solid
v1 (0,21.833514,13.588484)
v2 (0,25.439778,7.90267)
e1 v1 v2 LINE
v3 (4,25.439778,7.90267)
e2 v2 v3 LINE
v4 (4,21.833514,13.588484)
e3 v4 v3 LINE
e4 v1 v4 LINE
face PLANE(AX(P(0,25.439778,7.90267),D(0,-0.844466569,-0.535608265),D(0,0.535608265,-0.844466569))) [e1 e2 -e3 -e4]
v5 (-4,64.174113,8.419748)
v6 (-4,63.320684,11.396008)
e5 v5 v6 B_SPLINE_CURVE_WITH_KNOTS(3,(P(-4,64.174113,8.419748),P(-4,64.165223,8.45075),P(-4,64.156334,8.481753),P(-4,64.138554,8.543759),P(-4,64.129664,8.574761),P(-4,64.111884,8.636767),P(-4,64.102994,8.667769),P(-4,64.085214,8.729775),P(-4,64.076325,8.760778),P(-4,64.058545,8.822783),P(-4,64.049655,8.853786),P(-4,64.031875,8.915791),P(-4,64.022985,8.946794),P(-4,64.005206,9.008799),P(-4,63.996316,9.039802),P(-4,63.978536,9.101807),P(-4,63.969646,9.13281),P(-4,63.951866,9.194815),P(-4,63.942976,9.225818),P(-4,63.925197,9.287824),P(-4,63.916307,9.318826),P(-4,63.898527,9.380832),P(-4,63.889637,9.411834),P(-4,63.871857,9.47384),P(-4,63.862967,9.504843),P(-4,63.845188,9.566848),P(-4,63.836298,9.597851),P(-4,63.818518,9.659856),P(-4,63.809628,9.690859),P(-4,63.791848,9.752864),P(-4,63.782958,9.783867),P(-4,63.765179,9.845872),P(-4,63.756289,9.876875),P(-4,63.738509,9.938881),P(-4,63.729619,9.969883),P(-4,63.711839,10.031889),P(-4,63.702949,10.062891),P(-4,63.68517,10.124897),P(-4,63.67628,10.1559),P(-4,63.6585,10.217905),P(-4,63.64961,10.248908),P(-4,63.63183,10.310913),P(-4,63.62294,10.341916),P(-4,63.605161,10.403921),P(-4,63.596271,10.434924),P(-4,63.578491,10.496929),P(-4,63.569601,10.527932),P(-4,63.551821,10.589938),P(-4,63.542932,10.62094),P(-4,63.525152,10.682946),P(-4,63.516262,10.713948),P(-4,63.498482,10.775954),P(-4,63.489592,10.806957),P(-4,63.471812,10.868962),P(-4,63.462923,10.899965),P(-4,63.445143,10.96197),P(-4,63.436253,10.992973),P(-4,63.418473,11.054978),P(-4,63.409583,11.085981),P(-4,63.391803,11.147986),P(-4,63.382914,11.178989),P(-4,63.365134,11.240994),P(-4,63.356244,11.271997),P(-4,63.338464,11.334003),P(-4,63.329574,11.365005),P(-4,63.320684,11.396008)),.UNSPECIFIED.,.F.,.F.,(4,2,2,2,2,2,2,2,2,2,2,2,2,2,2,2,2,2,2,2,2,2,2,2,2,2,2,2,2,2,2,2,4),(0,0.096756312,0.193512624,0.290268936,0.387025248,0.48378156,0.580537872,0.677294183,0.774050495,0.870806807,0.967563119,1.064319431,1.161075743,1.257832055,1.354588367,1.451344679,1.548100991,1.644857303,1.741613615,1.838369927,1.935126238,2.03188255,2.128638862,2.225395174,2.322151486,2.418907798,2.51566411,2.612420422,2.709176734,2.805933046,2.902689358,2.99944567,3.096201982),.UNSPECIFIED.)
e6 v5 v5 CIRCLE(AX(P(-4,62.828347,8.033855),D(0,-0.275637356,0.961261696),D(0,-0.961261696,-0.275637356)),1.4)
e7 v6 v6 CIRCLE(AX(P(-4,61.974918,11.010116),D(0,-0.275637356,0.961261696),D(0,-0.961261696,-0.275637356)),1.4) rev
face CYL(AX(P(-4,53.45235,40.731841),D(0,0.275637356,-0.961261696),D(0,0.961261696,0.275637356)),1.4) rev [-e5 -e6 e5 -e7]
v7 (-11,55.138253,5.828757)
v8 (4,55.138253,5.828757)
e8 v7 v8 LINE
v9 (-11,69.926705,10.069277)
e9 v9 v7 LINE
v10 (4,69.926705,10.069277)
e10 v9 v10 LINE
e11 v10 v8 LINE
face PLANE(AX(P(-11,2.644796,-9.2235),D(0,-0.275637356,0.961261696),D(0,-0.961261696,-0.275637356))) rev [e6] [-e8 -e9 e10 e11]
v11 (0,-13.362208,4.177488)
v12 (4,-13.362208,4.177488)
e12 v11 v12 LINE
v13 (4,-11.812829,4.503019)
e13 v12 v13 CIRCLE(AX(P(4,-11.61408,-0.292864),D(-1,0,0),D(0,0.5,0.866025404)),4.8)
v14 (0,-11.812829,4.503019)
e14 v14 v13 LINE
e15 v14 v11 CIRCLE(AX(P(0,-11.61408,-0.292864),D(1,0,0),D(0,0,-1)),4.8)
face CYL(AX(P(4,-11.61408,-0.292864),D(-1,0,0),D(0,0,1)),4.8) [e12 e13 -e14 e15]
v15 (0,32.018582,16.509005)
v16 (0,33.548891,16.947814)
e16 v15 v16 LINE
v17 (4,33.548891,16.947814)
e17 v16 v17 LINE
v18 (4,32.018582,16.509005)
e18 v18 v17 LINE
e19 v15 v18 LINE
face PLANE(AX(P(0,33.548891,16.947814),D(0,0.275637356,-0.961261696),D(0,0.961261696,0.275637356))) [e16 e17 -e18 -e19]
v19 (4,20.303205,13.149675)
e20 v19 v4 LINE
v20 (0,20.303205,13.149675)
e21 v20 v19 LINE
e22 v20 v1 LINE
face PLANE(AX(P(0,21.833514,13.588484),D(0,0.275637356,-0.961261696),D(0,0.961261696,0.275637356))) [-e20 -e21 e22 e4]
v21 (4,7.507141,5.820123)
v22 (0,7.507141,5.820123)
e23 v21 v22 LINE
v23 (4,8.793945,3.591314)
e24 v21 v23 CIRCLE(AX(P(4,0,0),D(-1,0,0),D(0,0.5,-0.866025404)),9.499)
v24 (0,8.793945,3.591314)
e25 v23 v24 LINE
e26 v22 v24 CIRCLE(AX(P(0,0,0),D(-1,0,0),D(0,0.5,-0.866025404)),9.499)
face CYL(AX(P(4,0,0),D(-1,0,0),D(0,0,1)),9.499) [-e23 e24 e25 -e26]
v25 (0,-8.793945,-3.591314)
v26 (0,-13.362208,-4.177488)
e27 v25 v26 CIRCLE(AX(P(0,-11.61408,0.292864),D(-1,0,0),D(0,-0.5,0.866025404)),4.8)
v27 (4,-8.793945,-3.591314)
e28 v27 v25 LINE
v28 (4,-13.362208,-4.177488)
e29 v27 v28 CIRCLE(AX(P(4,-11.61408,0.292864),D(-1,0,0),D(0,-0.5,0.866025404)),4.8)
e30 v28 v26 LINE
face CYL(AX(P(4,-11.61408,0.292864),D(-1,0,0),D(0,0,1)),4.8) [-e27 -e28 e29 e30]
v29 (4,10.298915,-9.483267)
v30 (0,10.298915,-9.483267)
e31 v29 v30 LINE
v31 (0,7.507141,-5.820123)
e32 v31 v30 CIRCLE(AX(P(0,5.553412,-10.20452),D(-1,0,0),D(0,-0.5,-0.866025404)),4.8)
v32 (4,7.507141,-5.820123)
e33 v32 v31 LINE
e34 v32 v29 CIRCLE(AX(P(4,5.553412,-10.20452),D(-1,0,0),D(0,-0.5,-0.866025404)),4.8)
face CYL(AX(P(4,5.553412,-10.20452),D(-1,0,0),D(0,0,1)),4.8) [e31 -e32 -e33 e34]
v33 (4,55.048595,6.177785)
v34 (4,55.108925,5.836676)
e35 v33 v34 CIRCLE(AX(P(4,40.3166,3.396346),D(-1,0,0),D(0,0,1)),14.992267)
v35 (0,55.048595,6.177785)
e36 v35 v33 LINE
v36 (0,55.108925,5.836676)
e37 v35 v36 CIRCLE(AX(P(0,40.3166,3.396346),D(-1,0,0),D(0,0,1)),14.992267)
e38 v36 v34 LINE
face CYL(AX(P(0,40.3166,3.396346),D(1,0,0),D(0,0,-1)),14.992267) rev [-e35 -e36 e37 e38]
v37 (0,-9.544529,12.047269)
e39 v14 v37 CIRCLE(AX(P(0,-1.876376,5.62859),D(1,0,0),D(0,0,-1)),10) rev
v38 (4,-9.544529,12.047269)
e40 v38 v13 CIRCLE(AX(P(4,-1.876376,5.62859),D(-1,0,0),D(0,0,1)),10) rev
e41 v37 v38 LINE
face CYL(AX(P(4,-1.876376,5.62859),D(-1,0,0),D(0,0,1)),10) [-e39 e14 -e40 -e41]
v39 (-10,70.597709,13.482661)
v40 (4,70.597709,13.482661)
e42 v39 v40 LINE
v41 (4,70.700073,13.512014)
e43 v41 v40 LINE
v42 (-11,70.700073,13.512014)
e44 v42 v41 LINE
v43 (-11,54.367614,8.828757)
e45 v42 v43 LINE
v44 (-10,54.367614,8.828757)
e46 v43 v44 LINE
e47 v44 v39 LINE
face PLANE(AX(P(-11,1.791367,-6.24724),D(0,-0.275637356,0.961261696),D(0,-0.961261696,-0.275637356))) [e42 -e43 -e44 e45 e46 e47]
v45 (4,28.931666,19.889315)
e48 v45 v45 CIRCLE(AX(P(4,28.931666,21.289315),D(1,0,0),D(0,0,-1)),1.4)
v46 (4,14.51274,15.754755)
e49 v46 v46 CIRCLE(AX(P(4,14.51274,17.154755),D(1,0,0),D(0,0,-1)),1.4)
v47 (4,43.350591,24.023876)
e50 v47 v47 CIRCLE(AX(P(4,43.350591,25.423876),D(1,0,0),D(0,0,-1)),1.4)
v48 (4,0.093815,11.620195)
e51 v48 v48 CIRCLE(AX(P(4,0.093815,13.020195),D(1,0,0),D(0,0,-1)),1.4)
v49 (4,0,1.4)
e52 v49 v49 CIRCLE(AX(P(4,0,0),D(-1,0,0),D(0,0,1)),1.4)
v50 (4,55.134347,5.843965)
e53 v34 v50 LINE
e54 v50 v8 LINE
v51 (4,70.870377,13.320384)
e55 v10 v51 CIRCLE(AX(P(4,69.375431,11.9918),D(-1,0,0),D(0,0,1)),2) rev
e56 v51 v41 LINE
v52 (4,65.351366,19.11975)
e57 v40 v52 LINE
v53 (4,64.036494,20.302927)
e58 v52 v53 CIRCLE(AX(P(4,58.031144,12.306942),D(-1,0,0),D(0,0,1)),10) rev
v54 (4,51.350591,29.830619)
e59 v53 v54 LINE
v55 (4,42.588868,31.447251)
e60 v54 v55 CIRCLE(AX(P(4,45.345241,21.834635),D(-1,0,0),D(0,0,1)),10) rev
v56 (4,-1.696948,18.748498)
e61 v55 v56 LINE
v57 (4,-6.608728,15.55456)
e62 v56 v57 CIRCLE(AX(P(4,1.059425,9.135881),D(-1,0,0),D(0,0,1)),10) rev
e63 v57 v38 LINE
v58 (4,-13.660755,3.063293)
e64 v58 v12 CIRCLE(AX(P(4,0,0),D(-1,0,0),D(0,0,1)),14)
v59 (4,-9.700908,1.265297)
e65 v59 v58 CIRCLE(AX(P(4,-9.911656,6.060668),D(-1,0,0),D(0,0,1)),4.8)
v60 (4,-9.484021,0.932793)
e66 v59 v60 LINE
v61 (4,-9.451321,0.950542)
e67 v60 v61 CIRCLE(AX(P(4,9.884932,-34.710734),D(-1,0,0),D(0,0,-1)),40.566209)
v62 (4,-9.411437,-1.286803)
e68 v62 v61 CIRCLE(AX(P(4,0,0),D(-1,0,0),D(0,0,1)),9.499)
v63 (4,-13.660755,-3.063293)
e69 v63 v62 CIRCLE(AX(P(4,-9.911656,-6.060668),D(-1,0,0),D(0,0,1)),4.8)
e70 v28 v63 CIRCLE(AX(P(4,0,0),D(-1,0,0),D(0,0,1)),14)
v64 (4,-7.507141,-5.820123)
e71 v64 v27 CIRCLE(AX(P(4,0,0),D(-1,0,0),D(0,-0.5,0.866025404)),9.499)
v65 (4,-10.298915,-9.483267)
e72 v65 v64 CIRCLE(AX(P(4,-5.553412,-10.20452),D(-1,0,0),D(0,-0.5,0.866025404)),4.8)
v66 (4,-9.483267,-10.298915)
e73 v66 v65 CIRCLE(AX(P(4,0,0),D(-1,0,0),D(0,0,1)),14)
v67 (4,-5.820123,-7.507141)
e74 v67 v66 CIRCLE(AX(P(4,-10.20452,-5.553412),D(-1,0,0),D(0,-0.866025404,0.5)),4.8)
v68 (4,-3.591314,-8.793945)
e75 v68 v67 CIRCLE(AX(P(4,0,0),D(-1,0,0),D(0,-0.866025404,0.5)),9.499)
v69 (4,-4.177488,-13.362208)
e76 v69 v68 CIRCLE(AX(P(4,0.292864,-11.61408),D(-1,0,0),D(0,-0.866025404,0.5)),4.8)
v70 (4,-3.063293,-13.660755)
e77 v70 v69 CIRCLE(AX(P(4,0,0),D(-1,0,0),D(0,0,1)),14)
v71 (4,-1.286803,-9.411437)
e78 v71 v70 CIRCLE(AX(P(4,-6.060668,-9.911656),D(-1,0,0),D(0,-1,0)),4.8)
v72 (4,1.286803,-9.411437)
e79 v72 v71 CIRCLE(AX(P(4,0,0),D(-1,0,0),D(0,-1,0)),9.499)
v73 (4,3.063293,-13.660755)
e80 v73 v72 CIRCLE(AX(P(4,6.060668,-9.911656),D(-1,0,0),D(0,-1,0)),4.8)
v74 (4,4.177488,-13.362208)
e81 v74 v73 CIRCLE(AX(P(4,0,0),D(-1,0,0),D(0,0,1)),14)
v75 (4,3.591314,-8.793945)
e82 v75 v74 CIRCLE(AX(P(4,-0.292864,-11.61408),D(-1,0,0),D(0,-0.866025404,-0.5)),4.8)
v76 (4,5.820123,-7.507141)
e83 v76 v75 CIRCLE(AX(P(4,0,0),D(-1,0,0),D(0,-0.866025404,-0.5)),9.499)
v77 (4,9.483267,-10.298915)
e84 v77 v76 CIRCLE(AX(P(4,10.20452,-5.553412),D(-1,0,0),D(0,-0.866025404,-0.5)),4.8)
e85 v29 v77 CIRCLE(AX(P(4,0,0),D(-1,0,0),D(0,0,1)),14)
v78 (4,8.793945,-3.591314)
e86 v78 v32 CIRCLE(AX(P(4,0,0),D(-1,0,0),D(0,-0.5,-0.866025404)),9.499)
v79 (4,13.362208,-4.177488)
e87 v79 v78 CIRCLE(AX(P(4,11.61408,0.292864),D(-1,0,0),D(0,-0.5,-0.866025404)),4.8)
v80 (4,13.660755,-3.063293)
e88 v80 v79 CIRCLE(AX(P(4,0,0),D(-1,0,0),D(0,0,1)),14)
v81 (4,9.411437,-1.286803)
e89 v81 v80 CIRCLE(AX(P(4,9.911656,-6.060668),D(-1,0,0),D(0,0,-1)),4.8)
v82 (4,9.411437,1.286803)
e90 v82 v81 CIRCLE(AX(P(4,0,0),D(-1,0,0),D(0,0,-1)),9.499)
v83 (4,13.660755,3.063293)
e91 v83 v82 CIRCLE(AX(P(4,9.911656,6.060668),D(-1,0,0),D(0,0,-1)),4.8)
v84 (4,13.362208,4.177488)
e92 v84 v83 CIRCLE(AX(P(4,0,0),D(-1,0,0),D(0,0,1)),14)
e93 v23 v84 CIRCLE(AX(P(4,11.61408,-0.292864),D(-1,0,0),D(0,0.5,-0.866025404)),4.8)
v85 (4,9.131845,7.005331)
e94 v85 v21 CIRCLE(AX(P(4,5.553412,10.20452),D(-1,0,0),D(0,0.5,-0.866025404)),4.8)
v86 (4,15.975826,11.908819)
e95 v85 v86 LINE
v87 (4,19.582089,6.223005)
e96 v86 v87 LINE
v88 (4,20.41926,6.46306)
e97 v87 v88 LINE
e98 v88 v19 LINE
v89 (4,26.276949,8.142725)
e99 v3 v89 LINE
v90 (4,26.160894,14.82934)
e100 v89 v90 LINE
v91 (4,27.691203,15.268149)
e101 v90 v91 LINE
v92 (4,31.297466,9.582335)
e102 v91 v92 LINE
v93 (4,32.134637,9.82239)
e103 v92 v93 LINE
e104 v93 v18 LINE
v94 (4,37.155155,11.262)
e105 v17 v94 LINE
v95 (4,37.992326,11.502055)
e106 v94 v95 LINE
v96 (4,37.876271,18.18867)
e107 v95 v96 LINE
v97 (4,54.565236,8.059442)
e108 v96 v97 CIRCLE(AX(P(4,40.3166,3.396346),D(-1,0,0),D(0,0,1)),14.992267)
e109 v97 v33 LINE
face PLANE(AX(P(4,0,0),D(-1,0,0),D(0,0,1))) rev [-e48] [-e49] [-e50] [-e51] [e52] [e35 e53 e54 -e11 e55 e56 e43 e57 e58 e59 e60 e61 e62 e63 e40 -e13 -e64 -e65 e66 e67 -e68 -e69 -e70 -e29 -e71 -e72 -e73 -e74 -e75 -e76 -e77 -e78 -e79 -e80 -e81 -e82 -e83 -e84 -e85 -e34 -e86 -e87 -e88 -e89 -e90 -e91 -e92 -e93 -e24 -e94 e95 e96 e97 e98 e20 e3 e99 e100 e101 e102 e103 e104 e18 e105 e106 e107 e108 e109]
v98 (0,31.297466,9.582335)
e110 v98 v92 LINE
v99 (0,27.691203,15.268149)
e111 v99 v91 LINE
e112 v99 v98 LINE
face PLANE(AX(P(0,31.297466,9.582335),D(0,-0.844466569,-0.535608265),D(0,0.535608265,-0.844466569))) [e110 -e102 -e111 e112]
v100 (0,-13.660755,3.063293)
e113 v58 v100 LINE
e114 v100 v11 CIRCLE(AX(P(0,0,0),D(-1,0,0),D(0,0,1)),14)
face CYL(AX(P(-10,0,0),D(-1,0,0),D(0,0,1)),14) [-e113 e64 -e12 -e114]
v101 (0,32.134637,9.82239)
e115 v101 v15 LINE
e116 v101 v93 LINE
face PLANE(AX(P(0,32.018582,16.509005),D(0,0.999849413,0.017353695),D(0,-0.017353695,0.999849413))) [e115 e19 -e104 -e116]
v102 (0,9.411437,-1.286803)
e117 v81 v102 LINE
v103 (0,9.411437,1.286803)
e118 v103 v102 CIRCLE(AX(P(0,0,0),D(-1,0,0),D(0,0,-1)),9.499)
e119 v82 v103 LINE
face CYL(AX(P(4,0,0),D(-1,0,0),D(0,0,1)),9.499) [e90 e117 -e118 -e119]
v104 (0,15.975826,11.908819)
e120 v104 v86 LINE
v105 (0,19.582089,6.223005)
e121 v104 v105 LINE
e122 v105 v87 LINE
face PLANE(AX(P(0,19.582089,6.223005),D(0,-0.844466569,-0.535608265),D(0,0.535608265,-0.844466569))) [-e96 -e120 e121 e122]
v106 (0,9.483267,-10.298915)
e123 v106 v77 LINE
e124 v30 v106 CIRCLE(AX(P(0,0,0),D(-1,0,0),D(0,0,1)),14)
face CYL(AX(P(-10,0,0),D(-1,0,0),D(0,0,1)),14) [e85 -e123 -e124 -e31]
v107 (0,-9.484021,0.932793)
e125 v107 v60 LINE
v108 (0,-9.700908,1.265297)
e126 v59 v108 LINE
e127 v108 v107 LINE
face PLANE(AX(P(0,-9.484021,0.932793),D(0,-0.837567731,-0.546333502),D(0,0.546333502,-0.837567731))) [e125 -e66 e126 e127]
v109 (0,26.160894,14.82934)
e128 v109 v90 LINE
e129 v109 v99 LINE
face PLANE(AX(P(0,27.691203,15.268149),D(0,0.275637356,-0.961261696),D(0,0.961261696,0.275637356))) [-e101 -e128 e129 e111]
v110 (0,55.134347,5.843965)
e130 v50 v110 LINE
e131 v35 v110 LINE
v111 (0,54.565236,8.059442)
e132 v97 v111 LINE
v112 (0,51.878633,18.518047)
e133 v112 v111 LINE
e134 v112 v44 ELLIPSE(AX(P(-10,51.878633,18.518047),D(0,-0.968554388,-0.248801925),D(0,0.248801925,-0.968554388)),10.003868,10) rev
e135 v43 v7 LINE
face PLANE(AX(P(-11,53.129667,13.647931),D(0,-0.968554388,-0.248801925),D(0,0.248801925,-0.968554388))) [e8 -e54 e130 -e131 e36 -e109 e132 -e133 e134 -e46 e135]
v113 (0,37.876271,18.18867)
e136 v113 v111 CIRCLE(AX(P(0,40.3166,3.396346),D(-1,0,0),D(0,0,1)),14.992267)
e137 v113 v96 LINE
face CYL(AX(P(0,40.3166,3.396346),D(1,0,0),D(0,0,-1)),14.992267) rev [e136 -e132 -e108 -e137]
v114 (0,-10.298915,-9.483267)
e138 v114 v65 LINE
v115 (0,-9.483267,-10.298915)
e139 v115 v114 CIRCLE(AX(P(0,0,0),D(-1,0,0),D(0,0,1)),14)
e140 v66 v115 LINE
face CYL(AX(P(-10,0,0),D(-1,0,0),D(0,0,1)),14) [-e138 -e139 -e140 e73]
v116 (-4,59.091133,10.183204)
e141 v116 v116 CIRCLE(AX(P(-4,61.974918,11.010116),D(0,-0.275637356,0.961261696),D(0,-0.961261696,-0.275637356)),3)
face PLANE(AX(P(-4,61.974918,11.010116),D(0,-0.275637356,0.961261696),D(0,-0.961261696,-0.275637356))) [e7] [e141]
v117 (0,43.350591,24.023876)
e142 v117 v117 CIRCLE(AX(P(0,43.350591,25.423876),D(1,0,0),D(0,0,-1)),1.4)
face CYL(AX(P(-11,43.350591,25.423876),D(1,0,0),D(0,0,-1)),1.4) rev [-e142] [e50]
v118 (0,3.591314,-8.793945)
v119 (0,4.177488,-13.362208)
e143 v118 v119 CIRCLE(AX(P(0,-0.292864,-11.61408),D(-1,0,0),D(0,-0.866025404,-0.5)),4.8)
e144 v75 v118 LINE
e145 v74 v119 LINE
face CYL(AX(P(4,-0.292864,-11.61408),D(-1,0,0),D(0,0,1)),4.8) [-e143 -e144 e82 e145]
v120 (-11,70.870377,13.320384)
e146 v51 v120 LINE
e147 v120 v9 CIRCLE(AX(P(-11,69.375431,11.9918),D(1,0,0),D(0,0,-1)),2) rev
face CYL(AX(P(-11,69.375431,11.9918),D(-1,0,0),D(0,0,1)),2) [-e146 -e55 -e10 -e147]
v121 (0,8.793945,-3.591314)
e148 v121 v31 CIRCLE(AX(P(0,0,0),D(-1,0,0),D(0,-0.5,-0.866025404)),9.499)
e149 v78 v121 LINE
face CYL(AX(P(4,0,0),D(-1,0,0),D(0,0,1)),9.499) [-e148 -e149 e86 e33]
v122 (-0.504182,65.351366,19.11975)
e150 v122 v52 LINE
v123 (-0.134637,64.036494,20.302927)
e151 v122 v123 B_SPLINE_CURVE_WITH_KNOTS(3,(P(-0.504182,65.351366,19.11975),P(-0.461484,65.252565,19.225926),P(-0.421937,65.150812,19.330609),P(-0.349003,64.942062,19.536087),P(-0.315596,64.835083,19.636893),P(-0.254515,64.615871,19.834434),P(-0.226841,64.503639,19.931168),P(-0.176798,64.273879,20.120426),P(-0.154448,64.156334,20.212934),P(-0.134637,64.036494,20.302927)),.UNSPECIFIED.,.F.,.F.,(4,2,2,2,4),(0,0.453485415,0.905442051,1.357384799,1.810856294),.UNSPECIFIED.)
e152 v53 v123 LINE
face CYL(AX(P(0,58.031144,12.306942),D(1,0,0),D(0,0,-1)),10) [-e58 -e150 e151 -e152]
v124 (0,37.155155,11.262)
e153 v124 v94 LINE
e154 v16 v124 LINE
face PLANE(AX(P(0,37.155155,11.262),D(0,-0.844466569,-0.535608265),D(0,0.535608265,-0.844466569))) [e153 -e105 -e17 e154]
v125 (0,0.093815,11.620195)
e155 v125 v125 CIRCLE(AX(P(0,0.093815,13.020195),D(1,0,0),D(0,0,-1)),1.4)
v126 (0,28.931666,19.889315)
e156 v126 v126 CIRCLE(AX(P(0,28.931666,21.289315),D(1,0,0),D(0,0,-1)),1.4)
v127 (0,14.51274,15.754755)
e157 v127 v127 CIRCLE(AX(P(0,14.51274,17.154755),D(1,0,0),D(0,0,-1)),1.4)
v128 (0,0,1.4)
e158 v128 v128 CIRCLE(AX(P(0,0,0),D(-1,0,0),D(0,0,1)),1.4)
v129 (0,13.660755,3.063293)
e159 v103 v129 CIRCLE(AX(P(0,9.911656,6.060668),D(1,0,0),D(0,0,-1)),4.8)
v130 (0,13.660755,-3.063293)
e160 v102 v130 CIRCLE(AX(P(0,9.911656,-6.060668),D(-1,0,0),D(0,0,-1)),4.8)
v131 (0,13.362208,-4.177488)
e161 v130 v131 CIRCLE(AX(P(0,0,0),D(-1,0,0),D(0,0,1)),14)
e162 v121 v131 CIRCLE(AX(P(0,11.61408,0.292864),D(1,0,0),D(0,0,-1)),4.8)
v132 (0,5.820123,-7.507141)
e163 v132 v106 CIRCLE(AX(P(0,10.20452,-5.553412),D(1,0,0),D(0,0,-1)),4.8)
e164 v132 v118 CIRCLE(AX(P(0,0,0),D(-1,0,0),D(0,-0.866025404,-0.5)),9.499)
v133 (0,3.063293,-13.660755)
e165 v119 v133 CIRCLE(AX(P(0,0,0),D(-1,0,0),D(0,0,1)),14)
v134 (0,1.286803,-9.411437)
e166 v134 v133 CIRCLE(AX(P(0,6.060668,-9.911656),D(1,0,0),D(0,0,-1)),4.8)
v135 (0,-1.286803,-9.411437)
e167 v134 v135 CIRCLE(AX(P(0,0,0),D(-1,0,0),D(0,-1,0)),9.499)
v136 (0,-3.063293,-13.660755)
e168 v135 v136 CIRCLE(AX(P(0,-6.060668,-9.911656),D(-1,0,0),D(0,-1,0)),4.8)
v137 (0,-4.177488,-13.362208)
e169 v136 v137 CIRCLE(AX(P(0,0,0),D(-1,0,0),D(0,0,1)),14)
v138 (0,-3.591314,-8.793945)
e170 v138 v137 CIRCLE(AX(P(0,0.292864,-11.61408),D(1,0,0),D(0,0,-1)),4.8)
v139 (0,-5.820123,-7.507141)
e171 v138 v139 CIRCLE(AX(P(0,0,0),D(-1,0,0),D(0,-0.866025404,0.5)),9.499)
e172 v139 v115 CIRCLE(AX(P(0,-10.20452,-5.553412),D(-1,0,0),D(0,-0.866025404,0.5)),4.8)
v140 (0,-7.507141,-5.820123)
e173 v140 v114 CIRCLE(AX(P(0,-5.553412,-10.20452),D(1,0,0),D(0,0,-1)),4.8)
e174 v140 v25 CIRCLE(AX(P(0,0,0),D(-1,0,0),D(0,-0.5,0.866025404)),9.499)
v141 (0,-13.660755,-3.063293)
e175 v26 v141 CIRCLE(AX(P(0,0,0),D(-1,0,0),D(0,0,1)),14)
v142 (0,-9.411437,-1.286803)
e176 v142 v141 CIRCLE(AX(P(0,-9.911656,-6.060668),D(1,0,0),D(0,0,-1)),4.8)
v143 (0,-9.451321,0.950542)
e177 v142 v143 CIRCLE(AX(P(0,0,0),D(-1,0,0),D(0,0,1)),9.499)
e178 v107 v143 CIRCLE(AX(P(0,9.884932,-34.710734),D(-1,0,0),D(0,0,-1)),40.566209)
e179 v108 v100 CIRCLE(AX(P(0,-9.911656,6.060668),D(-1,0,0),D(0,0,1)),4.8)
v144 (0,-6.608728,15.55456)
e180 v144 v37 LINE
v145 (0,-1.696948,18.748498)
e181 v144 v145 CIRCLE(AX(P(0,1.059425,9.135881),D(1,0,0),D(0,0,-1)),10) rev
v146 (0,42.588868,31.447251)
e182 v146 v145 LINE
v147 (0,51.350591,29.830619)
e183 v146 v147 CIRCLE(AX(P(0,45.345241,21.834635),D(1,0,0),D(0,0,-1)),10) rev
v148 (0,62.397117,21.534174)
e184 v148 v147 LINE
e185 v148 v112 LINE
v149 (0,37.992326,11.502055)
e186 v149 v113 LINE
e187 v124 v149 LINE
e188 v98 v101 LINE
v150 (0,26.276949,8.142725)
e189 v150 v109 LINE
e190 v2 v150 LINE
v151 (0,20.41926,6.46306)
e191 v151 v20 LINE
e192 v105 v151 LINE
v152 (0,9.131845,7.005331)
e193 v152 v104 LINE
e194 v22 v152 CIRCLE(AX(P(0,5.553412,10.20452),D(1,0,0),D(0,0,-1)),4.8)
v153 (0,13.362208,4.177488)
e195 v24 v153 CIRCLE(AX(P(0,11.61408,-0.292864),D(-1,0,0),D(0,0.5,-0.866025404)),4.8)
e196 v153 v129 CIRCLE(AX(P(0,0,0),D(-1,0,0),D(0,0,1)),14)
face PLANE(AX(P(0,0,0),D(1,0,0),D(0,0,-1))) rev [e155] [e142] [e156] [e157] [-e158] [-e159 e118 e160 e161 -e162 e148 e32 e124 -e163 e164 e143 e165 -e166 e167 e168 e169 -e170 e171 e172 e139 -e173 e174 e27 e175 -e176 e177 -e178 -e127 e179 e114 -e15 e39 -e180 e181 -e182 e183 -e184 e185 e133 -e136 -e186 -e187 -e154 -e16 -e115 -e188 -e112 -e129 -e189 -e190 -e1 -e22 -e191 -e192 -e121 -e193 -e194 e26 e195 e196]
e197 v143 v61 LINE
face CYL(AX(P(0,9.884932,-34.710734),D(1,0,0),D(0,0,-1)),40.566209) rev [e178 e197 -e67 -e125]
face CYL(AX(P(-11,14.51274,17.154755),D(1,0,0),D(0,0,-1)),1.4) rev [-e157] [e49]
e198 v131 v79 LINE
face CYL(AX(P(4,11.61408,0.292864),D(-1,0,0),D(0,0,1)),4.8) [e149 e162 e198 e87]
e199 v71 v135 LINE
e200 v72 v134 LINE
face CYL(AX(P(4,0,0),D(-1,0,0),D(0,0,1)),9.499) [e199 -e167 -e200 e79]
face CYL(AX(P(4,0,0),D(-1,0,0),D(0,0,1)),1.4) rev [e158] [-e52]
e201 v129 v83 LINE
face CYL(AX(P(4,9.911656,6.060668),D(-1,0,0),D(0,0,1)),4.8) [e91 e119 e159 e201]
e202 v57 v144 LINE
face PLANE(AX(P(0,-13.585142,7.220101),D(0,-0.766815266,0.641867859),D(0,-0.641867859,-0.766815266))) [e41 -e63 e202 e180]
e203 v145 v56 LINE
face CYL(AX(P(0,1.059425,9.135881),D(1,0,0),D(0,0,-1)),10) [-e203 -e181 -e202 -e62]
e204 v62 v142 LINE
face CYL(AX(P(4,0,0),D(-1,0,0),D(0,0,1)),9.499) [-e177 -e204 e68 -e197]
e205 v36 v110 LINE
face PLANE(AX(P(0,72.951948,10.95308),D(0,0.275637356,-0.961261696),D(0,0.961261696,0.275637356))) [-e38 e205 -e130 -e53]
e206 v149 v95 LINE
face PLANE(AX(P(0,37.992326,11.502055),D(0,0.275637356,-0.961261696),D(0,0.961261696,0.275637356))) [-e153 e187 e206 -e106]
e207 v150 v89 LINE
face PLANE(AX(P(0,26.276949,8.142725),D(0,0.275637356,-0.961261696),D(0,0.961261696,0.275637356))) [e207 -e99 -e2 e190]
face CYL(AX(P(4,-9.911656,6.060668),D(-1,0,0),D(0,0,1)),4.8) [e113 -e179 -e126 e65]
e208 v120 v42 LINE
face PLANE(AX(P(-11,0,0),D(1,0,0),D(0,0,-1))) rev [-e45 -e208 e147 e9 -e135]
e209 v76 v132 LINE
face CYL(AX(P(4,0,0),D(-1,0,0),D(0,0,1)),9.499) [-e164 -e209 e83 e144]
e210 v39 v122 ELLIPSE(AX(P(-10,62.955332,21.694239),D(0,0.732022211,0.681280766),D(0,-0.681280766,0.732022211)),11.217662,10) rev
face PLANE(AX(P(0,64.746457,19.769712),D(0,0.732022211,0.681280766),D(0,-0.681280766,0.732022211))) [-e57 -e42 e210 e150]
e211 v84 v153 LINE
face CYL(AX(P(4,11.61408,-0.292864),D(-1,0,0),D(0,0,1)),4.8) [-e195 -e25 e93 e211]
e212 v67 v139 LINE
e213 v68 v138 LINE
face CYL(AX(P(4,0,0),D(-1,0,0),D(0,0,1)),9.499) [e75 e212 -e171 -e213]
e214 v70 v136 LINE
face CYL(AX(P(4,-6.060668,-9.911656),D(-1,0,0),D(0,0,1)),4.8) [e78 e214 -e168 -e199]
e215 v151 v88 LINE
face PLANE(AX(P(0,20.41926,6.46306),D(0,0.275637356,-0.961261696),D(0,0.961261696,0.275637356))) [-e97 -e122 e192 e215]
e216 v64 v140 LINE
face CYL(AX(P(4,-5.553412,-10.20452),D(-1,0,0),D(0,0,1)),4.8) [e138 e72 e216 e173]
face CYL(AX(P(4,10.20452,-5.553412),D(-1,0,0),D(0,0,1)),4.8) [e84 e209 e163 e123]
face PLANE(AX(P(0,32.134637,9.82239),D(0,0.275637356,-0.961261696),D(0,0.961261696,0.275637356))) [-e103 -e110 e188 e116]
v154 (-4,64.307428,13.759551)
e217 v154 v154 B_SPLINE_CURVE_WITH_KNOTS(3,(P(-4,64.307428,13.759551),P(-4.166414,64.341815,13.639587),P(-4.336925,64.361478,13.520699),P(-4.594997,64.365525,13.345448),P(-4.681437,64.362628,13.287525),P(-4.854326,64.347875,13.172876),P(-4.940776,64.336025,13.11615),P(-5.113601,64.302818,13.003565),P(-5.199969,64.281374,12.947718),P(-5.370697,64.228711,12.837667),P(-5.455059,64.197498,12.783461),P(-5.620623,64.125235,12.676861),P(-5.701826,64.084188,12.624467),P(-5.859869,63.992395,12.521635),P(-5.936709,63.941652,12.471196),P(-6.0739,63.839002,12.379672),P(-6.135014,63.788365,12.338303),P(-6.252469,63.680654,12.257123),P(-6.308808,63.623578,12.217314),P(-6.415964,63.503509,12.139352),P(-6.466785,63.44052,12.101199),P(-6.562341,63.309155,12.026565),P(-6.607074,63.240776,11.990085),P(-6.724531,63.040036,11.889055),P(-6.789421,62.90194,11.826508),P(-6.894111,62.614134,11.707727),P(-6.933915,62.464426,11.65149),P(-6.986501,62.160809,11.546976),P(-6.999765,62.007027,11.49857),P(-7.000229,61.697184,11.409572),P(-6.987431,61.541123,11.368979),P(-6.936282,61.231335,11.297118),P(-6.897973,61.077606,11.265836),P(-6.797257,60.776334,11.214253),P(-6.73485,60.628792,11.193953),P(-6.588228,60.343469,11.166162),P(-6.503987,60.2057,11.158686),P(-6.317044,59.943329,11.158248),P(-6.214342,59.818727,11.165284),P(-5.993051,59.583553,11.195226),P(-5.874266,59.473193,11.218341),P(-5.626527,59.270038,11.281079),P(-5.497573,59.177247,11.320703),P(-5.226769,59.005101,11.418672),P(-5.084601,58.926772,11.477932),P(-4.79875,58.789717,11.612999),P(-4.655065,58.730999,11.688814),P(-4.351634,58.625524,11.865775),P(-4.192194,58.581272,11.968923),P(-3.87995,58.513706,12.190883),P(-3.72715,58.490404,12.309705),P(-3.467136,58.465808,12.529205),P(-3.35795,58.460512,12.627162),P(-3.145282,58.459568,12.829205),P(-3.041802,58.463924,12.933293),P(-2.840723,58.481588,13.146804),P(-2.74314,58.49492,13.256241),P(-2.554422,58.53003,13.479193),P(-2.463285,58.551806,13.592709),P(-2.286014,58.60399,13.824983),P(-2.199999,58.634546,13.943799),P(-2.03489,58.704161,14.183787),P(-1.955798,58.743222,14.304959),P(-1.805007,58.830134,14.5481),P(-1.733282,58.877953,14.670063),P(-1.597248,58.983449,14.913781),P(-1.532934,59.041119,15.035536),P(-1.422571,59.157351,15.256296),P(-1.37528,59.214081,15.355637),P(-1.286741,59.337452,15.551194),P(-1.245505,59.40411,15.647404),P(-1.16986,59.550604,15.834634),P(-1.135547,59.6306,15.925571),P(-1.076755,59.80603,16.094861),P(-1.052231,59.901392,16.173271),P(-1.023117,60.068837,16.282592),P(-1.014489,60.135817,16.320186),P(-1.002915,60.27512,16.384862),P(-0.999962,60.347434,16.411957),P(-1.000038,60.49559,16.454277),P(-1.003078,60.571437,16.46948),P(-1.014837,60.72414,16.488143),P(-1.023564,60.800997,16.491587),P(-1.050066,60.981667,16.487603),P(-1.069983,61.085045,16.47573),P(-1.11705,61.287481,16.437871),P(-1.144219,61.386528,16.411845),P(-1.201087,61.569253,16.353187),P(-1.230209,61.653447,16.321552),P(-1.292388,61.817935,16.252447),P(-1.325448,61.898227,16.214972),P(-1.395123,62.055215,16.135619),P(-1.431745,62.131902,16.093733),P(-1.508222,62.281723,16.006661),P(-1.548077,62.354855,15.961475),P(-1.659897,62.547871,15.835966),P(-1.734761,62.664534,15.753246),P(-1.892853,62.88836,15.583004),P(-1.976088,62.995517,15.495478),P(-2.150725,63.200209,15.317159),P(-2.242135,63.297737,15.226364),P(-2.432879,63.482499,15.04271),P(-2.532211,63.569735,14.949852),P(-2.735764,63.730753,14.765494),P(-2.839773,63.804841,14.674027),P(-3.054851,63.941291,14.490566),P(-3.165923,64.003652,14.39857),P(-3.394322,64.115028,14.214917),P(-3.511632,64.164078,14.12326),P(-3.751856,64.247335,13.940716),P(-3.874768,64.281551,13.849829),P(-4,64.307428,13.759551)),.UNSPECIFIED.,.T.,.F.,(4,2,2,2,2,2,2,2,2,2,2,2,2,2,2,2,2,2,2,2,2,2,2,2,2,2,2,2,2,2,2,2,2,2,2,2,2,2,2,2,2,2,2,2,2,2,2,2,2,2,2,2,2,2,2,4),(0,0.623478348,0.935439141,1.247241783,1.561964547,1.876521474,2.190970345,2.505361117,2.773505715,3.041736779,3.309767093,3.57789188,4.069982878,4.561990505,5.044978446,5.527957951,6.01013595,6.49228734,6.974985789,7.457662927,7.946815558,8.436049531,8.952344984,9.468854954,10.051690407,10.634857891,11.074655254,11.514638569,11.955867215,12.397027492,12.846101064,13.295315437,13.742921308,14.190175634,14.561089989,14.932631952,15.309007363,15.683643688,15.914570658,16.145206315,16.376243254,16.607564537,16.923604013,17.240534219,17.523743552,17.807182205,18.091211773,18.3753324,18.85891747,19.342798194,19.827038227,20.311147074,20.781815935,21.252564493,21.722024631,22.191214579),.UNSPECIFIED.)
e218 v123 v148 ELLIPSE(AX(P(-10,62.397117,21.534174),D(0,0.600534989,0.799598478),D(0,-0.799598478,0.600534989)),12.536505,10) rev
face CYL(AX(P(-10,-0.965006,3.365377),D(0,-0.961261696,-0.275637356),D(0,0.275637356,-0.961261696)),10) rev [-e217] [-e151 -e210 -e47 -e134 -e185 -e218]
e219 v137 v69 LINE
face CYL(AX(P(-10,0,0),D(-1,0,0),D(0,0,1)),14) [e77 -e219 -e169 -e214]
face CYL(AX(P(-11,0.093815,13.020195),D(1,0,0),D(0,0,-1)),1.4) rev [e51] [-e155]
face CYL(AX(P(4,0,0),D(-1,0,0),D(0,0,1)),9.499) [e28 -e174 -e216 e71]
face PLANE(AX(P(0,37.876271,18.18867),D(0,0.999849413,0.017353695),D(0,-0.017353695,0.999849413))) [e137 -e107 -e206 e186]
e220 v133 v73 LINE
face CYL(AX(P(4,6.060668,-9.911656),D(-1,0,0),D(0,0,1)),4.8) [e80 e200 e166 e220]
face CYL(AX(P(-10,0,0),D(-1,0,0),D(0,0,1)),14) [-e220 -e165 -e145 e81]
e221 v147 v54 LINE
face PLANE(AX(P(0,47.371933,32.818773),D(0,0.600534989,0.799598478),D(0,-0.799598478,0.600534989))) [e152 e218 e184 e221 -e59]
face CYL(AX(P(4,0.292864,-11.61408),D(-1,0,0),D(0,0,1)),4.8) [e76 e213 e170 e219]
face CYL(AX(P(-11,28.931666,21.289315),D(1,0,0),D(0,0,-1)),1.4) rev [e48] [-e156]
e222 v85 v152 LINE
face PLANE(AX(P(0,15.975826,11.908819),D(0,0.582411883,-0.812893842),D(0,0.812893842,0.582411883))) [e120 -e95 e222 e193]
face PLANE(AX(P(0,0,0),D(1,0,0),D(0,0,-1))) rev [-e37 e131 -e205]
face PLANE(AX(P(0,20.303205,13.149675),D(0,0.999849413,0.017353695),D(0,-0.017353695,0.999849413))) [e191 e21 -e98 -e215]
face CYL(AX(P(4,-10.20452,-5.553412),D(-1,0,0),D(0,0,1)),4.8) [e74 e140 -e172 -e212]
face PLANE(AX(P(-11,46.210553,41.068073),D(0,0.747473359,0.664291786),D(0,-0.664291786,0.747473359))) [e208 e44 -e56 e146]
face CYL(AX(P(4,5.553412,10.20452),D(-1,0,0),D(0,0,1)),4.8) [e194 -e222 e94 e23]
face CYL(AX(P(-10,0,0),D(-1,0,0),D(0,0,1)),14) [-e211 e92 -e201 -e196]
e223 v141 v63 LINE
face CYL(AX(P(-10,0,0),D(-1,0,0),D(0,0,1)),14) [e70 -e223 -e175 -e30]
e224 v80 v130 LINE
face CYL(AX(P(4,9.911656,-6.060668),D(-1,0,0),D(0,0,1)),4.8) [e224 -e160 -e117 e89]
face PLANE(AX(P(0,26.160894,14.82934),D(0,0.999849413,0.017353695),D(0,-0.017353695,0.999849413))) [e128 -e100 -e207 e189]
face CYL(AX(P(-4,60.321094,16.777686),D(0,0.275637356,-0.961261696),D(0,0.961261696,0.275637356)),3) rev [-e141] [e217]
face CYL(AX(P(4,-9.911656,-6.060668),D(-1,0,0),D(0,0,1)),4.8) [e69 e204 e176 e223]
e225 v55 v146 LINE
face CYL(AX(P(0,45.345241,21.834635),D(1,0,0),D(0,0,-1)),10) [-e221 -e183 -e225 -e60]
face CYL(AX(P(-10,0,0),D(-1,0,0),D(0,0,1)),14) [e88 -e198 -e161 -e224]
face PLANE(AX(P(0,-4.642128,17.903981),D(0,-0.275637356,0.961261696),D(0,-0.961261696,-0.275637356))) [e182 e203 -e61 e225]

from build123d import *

# Parameters (mm, degrees)
BASPROSKE_W              = 4
BASPROSKE_H              = 14
TOOTHCUT_DEPTH           = 21.199009877
TEETHCUTS_COUNT          = 12
TEETHCUTS_ANGLE          = 330
BORSKE_R                 = 4
BORE_DEPTH               = 50.0000508
EXTRUDE_1_DEPTH          = 4
FILLET_1_R               = 10
EXTRUDE_2_DEPTH          = 15
FILLET_2_R               = 2
FILLET_3_R               = 10
EXTRUDE_START            = -4
SKETCH_6_R               = 4
SKETCH_6_R_2             = 1.4
EXTRUDE_3_DEPTH          = 4
CUT_EXTRUDE_6_DEPTH      = 15
CUT_EXTRUDE_6_DEPTH_BACK = 34
SKETCH_7_R               = 1.4
SKETCH_8_R               = 3
CUT_EXTRUDE_7_DEPTH      = 6
SKETCH_10_R              = 1.4
CUT_EXTRUDE_8_DEPTH      = 15


with BuildPart() as part:
    # BasProSke → Base-Revolve (revolve)
    with BuildSketch(Plane(origin=(0, 0, 0), x_dir=(1, 0, 0), z_dir=(0, 1, 0)), mode=Mode.PRIVATE) as base_revolve_sk:
        with Locations((2, 7)):
            Rectangle(BASPROSKE_W, BASPROSKE_H)
    revolve(base_revolve_sk.sketch.rotate(Axis((-10, 0, 0), (1, 0, 0)), 180), axis=Axis((-10, 0, 0), (1, 0, 0)))

    # TooCutSke → ToothCut (cut, through all)
    with BuildSketch(Plane(origin=(0, 0, 0), x_dir=(0, 0, -1), z_dir=(1, 0, 0))):
        with BuildLine():
            ThreePointArc((1.286803432, 9.41143655), (0, 9.499), (-1.286803432, 9.41143655))
            ThreePointArc((-1.286803432, 9.41143655), (-1.63841703, 11.778122922), (-3.088844097, 13.681041163))
            ThreePointArc((-3.088844097, 13.681041163), (0, 14.0254), (3.088844097, 13.681041163))
            ThreePointArc((3.088844097, 13.681041163), (1.63841703, 11.778122922), (1.286803432, 9.41143655))
        make_face()
    toothcut = extrude(amount=TOOTHCUT_DEPTH, mode=Mode.SUBTRACT)

    # TeethCuts: ToothCut ×12 about axis
    teethcuts_axis = Axis((-10, 0, 0), (1, 0, 0))
    for i in range(1, TEETHCUTS_COUNT):
        add(toothcut.rotate(teethcuts_axis, i * TEETHCUTS_ANGLE / (TEETHCUTS_COUNT - 1)), mode=Mode.SUBTRACT)

    # BorSke → Bore (cut, symmetric)
    with BuildSketch(Plane(origin=(0, 0, 0), x_dir=(0, 0, -1), z_dir=(1, 0, 0))):
        with Locations(Location((0, 0, 0), (0, 0, 180))):
            Circle(BORSKE_R)
    extrude(amount=BORE_DEPTH, both=True, mode=Mode.SUBTRACT)

    # 草图3 → 凸台-拉伸1 (add)
    with BuildSketch(Plane(origin=(4, 0, 0), x_dir=(0, 0, -1), z_dir=(1, 0, 0))):
        with BuildLine():
            Line((-0.932792576, -9.484020621), (-7.220100828, -13.585142245))
            Line((-7.220100828, -13.585142245), (-17.903981346, -4.642128436))
            Line((-17.903981346, -4.642128436), (-27.107817182, 27.455461598))
            Line((-27.107817182, 27.455461598), (-31.27472335, 41.987190356))
            Line((-31.27472335, 41.987190356), (-32.818773393, 47.371932777))
            Line((-32.818773393, 47.371932777), (-19.769712012, 64.746456846))
            Line((-19.769712012, 64.746456846), (-10.953080107, 72.951947941))
            Line((-10.953080107, 72.951947941), (-6.126084714, 56.118214487))
            Line((-6.126084714, 56.118214487), (-5.836675561, 55.108924829))
            ThreePointArc((-5.836675561, 55.108924829), (-15.58167252, 49.050779668), (-18.188670428, 37.876270712))
            Line((-18.188670428, 37.876270712), (-11.502054977, 37.992325671))
            Line((-11.502054977, 37.992325671), (-11.26200008, 37.155154756))
            Line((-11.26200008, 37.155154756), (-16.947814294, 33.548891109))
            Line((-16.947814294, 33.548891109), (-16.509005291, 32.018582252))
            Line((-16.509005291, 32.018582252), (-9.82238984, 32.134637212))
            Line((-9.82238984, 32.134637212), (-9.582334943, 31.297466297))
            Line((-9.582334943, 31.297466297), (-15.268149157, 27.691202649))
            Line((-15.268149157, 27.691202649), (-14.829340154, 26.160893793))
            Line((-14.829340154, 26.160893793), (-8.142724703, 26.276948752))
            Line((-8.142724703, 26.276948752), (-7.902669806, 25.439777837))
            Line((-7.902669806, 25.439777837), (-13.58848402, 21.83351419))
            Line((-13.58848402, 21.83351419), (-13.149675017, 20.303205333))
            Line((-13.149675017, 20.303205333), (-6.463059566, 20.419260292))
            Line((-6.463059566, 20.419260292), (-6.223004669, 19.582089377))
            Line((-6.223004669, 19.582089377), (-11.908818883, 15.97582573))
            Line((-11.908818883, 15.97582573), (-5.780671989, 7.422544069))
            ThreePointArc((-5.780671989, 7.422544069), (-4.284008868, -1.296630558), (-0.932792576, -9.484020621))
        make_face()
    extrude(amount=-EXTRUDE_1_DEPTH)

    # 圆角1
    # the kernel refuses this fillet: 10 mm, written as the material it takes off along each edge
    with BuildSketch(Plane(origin=(16.439550253, 47.371932777, 32.818773393), x_dir=(0, 0.7995984784044031, -0.6005349892665399), z_dir=(-1, 0, 0))) as fillet_1_piece_1:
        with BuildLine():
            CenterArc((FILLET_1_R * 0.497582010116, FILLET_1_R), FILLET_1_R, 217.091776954, 52.908223046)
            Line((-FILLET_1_R * 0.300088482439, FILLET_1_R * 0.396906487096), (-FILLET_1_R * 0.31604189229, FILLET_1_R * 0.384844616838))
            Line((-FILLET_1_R * 0.31604189229, FILLET_1_R * 0.384844616838), (-FILLET_1_R * 0.00995164020233, -FILLET_1_R * 0.02))
            Line((-FILLET_1_R * 0.00995164020233, -FILLET_1_R * 0.02), (FILLET_1_R * 0.497582010116, -FILLET_1_R * 0.02))
            Line((FILLET_1_R * 0.497582010116, -FILLET_1_R * 0.02), (FILLET_1_R * 0.497582010116, 0))
        make_face()
    extrude(amount=28.879100506, mode=Mode.SUBTRACT)
    with BuildSketch(Plane(origin=(6.219749224, 64.746456846, 19.769712012), x_dir=(0, 0.6812807658980115, -0.7320222114235461), z_dir=(-1, 0, 0))) as fillet_1_piece_2:
        with BuildLine():
            CenterArc((FILLET_1_R * 0.0887899689748, FILLET_1_R), FILLET_1_R, 259.852030904, 10.147969096)
            Line((-FILLET_1_R * 0.0874009400017, FILLET_1_R * 0.0156439853417), (-FILLET_1_R * 0.0909247581812, -FILLET_1_R * 0.00404313495151))
            Line((-FILLET_1_R * 0.0909247581812, -FILLET_1_R * 0.00404313495151), (-FILLET_1_R * 0.0017757993795, -FILLET_1_R * 0.02))
            Line((-FILLET_1_R * 0.0017757993795, -FILLET_1_R * 0.02), (FILLET_1_R * 0.0887899689748, -FILLET_1_R * 0.02))
            Line((FILLET_1_R * 0.0887899689748, -FILLET_1_R * 0.02), (FILLET_1_R * 0.0887899689748, 0))
        make_face()
    extrude(amount=8.439498449, mode=Mode.SUBTRACT)
    with BuildSketch(Plane(origin=(11.659672741, -4.642128436, 17.903981346), x_dir=(0, 0.9612616959383188, 0.2756373558169997), z_dir=(-1, 0, 0))) as fillet_1_piece_3:
        with BuildLine():
            CenterArc((FILLET_1_R * 0.306386909629, FILLET_1_R), FILLET_1_R, 235.931242449, 34.068757551)
            Line((-FILLET_1_R * 0.253800473888, FILLET_1_R * 0.171634081249), (-FILLET_1_R * 0.265004221559, FILLET_1_R * 0.155066762874))
            Line((-FILLET_1_R * 0.265004221559, FILLET_1_R * 0.155066762874), (-FILLET_1_R * 0.00612773819259, -FILLET_1_R * 0.02))
            Line((-FILLET_1_R * 0.00612773819259, -FILLET_1_R * 0.02), (FILLET_1_R * 0.306386909629, -FILLET_1_R * 0.02))
            Line((FILLET_1_R * 0.306386909629, -FILLET_1_R * 0.02), (FILLET_1_R * 0.306386909629, 0))
        make_face()
    extrude(amount=19.319345481, mode=Mode.SUBTRACT)
    with BuildSketch(Plane(origin=(19.737715423, -13.585142245, 7.220100828), x_dir=(0, 0.6418678587609061, 0.7668152658167999), z_dir=(-1, 0, 0))) as fillet_1_piece_4_section:
        with BuildLine():
            CenterArc((6.295086169, 10), FILLET_1_R, 223.606014756, 46.393985244)
            Line((-0.945908461, 3.103044385), (-1.090728354, 2.965105272))
            ThreePointArc((-1.090728354, 2.965105272), (-0.664263166, 1.493205031), (-0.191308935, -0.058317161))
            Line((-0.191308935, -0.058317161), (0, -0.2))
            Line((0, -0.2), (6.295086169, -0.2))
            Line((6.295086169, -0.2), (6.295086169, 0))
        make_face()
    fillet_1_piece_4 = extrude(amount=35.475430846, mode=Mode.PRIVATE)
    fillet_1_piece_4 = fillet_1_piece_4 - Plane(origin=(2, -11.614079795, -0.29286421), x_dir=(0, 0.587528112701377, 0.8092037548019401), z_dir=(-1, 0, 0)) * Cylinder(4.8, 97, mode=Mode.PRIVATE)
    add(fillet_1_piece_4, mode=Mode.SUBTRACT)

    # 草图4 → 凸台-拉伸2 (add)
    with BuildSketch(Plane(origin=(4, 0, 0), x_dir=(0, 0, -1), z_dir=(1, 0, 0))):
        Polygon((-13.512013594, 70.700072728), (-8.828756529, 54.367614394), (-5.828756529, 55.138253385), (-10.945161074, 72.981276497), align=None)
    extrude(amount=-EXTRUDE_2_DEPTH)

    # 圆角2
    fillet_2_edges = [part.edges().sort_by_distance(p)[0] for p in [
        (-3.5, 72.981276497, 10.945161074),
    ]]
    fillet(fillet_2_edges, radius=FILLET_2_R)

    # 圆角3
    fillet_3_edges = [part.edges().sort_by_distance(p)[0] for p in [
        (0, 62.482661808, 11.15570893),
    ]]
    fillet(fillet_3_edges, radius=FILLET_3_R)

    # 草图6 → 凸台-拉伸3 (add)
    with BuildSketch(Plane.ZY.offset(EXTRUDE_START)):
        Circle(SKETCH_6_R)
        Circle(SKETCH_6_R_2, mode=Mode.SUBTRACT)
    extrude(amount=EXTRUDE_3_DEPTH)

    # 草图7 → 切除-拉伸6 (cut, two sides: drawn at the far end of the back side and taken through both)
    with BuildSketch(Plane(origin=(0, 2.640469614, -9.20841187), x_dir=(-1, 0, 0), z_dir=(0, 0.275637355817, -0.9612616959383188)).offset(-CUT_EXTRUDE_6_DEPTH_BACK)):
        with Locations(Location((4, 62.608913997, 0), (0, 0, 90))):
            Circle(SKETCH_7_R)
    extrude(amount=CUT_EXTRUDE_6_DEPTH + CUT_EXTRUDE_6_DEPTH_BACK, mode=Mode.SUBTRACT)

    # 草图8 → 切除-拉伸7 (cut)
    with BuildSketch(Plane(origin=(0, 1.791367175, -6.247239762), x_dir=(1, 0, 0), z_dir=(0, -0.275637355817, 0.9612616959383187))):
        with Locations(Location((-4, 62.608913997, 0), (0, 0, 90))):
            Circle(SKETCH_8_R)
    extrude(amount=CUT_EXTRUDE_7_DEPTH, mode=Mode.SUBTRACT)

    # 草图10 → 切除-拉伸8 (cut)
    with BuildSketch(Plane(origin=(4, 0, 0), x_dir=(0, 0, -1), z_dir=(1, 0, 0))):
        with Locations((-25.423875567, 43.350590959)):
            Circle(SKETCH_10_R)
        with Locations((-21.28931523, 28.93166552)):
            Circle(SKETCH_10_R)
        with Locations((-17.154754893, 14.512740081)):
            Circle(SKETCH_10_R)
        with Locations((-13.020194555, 0.093814642)):
            Circle(SKETCH_10_R)
    extrude(amount=-CUT_EXTRUDE_8_DEPTH, mode=Mode.SUBTRACT)


solid = part.part
